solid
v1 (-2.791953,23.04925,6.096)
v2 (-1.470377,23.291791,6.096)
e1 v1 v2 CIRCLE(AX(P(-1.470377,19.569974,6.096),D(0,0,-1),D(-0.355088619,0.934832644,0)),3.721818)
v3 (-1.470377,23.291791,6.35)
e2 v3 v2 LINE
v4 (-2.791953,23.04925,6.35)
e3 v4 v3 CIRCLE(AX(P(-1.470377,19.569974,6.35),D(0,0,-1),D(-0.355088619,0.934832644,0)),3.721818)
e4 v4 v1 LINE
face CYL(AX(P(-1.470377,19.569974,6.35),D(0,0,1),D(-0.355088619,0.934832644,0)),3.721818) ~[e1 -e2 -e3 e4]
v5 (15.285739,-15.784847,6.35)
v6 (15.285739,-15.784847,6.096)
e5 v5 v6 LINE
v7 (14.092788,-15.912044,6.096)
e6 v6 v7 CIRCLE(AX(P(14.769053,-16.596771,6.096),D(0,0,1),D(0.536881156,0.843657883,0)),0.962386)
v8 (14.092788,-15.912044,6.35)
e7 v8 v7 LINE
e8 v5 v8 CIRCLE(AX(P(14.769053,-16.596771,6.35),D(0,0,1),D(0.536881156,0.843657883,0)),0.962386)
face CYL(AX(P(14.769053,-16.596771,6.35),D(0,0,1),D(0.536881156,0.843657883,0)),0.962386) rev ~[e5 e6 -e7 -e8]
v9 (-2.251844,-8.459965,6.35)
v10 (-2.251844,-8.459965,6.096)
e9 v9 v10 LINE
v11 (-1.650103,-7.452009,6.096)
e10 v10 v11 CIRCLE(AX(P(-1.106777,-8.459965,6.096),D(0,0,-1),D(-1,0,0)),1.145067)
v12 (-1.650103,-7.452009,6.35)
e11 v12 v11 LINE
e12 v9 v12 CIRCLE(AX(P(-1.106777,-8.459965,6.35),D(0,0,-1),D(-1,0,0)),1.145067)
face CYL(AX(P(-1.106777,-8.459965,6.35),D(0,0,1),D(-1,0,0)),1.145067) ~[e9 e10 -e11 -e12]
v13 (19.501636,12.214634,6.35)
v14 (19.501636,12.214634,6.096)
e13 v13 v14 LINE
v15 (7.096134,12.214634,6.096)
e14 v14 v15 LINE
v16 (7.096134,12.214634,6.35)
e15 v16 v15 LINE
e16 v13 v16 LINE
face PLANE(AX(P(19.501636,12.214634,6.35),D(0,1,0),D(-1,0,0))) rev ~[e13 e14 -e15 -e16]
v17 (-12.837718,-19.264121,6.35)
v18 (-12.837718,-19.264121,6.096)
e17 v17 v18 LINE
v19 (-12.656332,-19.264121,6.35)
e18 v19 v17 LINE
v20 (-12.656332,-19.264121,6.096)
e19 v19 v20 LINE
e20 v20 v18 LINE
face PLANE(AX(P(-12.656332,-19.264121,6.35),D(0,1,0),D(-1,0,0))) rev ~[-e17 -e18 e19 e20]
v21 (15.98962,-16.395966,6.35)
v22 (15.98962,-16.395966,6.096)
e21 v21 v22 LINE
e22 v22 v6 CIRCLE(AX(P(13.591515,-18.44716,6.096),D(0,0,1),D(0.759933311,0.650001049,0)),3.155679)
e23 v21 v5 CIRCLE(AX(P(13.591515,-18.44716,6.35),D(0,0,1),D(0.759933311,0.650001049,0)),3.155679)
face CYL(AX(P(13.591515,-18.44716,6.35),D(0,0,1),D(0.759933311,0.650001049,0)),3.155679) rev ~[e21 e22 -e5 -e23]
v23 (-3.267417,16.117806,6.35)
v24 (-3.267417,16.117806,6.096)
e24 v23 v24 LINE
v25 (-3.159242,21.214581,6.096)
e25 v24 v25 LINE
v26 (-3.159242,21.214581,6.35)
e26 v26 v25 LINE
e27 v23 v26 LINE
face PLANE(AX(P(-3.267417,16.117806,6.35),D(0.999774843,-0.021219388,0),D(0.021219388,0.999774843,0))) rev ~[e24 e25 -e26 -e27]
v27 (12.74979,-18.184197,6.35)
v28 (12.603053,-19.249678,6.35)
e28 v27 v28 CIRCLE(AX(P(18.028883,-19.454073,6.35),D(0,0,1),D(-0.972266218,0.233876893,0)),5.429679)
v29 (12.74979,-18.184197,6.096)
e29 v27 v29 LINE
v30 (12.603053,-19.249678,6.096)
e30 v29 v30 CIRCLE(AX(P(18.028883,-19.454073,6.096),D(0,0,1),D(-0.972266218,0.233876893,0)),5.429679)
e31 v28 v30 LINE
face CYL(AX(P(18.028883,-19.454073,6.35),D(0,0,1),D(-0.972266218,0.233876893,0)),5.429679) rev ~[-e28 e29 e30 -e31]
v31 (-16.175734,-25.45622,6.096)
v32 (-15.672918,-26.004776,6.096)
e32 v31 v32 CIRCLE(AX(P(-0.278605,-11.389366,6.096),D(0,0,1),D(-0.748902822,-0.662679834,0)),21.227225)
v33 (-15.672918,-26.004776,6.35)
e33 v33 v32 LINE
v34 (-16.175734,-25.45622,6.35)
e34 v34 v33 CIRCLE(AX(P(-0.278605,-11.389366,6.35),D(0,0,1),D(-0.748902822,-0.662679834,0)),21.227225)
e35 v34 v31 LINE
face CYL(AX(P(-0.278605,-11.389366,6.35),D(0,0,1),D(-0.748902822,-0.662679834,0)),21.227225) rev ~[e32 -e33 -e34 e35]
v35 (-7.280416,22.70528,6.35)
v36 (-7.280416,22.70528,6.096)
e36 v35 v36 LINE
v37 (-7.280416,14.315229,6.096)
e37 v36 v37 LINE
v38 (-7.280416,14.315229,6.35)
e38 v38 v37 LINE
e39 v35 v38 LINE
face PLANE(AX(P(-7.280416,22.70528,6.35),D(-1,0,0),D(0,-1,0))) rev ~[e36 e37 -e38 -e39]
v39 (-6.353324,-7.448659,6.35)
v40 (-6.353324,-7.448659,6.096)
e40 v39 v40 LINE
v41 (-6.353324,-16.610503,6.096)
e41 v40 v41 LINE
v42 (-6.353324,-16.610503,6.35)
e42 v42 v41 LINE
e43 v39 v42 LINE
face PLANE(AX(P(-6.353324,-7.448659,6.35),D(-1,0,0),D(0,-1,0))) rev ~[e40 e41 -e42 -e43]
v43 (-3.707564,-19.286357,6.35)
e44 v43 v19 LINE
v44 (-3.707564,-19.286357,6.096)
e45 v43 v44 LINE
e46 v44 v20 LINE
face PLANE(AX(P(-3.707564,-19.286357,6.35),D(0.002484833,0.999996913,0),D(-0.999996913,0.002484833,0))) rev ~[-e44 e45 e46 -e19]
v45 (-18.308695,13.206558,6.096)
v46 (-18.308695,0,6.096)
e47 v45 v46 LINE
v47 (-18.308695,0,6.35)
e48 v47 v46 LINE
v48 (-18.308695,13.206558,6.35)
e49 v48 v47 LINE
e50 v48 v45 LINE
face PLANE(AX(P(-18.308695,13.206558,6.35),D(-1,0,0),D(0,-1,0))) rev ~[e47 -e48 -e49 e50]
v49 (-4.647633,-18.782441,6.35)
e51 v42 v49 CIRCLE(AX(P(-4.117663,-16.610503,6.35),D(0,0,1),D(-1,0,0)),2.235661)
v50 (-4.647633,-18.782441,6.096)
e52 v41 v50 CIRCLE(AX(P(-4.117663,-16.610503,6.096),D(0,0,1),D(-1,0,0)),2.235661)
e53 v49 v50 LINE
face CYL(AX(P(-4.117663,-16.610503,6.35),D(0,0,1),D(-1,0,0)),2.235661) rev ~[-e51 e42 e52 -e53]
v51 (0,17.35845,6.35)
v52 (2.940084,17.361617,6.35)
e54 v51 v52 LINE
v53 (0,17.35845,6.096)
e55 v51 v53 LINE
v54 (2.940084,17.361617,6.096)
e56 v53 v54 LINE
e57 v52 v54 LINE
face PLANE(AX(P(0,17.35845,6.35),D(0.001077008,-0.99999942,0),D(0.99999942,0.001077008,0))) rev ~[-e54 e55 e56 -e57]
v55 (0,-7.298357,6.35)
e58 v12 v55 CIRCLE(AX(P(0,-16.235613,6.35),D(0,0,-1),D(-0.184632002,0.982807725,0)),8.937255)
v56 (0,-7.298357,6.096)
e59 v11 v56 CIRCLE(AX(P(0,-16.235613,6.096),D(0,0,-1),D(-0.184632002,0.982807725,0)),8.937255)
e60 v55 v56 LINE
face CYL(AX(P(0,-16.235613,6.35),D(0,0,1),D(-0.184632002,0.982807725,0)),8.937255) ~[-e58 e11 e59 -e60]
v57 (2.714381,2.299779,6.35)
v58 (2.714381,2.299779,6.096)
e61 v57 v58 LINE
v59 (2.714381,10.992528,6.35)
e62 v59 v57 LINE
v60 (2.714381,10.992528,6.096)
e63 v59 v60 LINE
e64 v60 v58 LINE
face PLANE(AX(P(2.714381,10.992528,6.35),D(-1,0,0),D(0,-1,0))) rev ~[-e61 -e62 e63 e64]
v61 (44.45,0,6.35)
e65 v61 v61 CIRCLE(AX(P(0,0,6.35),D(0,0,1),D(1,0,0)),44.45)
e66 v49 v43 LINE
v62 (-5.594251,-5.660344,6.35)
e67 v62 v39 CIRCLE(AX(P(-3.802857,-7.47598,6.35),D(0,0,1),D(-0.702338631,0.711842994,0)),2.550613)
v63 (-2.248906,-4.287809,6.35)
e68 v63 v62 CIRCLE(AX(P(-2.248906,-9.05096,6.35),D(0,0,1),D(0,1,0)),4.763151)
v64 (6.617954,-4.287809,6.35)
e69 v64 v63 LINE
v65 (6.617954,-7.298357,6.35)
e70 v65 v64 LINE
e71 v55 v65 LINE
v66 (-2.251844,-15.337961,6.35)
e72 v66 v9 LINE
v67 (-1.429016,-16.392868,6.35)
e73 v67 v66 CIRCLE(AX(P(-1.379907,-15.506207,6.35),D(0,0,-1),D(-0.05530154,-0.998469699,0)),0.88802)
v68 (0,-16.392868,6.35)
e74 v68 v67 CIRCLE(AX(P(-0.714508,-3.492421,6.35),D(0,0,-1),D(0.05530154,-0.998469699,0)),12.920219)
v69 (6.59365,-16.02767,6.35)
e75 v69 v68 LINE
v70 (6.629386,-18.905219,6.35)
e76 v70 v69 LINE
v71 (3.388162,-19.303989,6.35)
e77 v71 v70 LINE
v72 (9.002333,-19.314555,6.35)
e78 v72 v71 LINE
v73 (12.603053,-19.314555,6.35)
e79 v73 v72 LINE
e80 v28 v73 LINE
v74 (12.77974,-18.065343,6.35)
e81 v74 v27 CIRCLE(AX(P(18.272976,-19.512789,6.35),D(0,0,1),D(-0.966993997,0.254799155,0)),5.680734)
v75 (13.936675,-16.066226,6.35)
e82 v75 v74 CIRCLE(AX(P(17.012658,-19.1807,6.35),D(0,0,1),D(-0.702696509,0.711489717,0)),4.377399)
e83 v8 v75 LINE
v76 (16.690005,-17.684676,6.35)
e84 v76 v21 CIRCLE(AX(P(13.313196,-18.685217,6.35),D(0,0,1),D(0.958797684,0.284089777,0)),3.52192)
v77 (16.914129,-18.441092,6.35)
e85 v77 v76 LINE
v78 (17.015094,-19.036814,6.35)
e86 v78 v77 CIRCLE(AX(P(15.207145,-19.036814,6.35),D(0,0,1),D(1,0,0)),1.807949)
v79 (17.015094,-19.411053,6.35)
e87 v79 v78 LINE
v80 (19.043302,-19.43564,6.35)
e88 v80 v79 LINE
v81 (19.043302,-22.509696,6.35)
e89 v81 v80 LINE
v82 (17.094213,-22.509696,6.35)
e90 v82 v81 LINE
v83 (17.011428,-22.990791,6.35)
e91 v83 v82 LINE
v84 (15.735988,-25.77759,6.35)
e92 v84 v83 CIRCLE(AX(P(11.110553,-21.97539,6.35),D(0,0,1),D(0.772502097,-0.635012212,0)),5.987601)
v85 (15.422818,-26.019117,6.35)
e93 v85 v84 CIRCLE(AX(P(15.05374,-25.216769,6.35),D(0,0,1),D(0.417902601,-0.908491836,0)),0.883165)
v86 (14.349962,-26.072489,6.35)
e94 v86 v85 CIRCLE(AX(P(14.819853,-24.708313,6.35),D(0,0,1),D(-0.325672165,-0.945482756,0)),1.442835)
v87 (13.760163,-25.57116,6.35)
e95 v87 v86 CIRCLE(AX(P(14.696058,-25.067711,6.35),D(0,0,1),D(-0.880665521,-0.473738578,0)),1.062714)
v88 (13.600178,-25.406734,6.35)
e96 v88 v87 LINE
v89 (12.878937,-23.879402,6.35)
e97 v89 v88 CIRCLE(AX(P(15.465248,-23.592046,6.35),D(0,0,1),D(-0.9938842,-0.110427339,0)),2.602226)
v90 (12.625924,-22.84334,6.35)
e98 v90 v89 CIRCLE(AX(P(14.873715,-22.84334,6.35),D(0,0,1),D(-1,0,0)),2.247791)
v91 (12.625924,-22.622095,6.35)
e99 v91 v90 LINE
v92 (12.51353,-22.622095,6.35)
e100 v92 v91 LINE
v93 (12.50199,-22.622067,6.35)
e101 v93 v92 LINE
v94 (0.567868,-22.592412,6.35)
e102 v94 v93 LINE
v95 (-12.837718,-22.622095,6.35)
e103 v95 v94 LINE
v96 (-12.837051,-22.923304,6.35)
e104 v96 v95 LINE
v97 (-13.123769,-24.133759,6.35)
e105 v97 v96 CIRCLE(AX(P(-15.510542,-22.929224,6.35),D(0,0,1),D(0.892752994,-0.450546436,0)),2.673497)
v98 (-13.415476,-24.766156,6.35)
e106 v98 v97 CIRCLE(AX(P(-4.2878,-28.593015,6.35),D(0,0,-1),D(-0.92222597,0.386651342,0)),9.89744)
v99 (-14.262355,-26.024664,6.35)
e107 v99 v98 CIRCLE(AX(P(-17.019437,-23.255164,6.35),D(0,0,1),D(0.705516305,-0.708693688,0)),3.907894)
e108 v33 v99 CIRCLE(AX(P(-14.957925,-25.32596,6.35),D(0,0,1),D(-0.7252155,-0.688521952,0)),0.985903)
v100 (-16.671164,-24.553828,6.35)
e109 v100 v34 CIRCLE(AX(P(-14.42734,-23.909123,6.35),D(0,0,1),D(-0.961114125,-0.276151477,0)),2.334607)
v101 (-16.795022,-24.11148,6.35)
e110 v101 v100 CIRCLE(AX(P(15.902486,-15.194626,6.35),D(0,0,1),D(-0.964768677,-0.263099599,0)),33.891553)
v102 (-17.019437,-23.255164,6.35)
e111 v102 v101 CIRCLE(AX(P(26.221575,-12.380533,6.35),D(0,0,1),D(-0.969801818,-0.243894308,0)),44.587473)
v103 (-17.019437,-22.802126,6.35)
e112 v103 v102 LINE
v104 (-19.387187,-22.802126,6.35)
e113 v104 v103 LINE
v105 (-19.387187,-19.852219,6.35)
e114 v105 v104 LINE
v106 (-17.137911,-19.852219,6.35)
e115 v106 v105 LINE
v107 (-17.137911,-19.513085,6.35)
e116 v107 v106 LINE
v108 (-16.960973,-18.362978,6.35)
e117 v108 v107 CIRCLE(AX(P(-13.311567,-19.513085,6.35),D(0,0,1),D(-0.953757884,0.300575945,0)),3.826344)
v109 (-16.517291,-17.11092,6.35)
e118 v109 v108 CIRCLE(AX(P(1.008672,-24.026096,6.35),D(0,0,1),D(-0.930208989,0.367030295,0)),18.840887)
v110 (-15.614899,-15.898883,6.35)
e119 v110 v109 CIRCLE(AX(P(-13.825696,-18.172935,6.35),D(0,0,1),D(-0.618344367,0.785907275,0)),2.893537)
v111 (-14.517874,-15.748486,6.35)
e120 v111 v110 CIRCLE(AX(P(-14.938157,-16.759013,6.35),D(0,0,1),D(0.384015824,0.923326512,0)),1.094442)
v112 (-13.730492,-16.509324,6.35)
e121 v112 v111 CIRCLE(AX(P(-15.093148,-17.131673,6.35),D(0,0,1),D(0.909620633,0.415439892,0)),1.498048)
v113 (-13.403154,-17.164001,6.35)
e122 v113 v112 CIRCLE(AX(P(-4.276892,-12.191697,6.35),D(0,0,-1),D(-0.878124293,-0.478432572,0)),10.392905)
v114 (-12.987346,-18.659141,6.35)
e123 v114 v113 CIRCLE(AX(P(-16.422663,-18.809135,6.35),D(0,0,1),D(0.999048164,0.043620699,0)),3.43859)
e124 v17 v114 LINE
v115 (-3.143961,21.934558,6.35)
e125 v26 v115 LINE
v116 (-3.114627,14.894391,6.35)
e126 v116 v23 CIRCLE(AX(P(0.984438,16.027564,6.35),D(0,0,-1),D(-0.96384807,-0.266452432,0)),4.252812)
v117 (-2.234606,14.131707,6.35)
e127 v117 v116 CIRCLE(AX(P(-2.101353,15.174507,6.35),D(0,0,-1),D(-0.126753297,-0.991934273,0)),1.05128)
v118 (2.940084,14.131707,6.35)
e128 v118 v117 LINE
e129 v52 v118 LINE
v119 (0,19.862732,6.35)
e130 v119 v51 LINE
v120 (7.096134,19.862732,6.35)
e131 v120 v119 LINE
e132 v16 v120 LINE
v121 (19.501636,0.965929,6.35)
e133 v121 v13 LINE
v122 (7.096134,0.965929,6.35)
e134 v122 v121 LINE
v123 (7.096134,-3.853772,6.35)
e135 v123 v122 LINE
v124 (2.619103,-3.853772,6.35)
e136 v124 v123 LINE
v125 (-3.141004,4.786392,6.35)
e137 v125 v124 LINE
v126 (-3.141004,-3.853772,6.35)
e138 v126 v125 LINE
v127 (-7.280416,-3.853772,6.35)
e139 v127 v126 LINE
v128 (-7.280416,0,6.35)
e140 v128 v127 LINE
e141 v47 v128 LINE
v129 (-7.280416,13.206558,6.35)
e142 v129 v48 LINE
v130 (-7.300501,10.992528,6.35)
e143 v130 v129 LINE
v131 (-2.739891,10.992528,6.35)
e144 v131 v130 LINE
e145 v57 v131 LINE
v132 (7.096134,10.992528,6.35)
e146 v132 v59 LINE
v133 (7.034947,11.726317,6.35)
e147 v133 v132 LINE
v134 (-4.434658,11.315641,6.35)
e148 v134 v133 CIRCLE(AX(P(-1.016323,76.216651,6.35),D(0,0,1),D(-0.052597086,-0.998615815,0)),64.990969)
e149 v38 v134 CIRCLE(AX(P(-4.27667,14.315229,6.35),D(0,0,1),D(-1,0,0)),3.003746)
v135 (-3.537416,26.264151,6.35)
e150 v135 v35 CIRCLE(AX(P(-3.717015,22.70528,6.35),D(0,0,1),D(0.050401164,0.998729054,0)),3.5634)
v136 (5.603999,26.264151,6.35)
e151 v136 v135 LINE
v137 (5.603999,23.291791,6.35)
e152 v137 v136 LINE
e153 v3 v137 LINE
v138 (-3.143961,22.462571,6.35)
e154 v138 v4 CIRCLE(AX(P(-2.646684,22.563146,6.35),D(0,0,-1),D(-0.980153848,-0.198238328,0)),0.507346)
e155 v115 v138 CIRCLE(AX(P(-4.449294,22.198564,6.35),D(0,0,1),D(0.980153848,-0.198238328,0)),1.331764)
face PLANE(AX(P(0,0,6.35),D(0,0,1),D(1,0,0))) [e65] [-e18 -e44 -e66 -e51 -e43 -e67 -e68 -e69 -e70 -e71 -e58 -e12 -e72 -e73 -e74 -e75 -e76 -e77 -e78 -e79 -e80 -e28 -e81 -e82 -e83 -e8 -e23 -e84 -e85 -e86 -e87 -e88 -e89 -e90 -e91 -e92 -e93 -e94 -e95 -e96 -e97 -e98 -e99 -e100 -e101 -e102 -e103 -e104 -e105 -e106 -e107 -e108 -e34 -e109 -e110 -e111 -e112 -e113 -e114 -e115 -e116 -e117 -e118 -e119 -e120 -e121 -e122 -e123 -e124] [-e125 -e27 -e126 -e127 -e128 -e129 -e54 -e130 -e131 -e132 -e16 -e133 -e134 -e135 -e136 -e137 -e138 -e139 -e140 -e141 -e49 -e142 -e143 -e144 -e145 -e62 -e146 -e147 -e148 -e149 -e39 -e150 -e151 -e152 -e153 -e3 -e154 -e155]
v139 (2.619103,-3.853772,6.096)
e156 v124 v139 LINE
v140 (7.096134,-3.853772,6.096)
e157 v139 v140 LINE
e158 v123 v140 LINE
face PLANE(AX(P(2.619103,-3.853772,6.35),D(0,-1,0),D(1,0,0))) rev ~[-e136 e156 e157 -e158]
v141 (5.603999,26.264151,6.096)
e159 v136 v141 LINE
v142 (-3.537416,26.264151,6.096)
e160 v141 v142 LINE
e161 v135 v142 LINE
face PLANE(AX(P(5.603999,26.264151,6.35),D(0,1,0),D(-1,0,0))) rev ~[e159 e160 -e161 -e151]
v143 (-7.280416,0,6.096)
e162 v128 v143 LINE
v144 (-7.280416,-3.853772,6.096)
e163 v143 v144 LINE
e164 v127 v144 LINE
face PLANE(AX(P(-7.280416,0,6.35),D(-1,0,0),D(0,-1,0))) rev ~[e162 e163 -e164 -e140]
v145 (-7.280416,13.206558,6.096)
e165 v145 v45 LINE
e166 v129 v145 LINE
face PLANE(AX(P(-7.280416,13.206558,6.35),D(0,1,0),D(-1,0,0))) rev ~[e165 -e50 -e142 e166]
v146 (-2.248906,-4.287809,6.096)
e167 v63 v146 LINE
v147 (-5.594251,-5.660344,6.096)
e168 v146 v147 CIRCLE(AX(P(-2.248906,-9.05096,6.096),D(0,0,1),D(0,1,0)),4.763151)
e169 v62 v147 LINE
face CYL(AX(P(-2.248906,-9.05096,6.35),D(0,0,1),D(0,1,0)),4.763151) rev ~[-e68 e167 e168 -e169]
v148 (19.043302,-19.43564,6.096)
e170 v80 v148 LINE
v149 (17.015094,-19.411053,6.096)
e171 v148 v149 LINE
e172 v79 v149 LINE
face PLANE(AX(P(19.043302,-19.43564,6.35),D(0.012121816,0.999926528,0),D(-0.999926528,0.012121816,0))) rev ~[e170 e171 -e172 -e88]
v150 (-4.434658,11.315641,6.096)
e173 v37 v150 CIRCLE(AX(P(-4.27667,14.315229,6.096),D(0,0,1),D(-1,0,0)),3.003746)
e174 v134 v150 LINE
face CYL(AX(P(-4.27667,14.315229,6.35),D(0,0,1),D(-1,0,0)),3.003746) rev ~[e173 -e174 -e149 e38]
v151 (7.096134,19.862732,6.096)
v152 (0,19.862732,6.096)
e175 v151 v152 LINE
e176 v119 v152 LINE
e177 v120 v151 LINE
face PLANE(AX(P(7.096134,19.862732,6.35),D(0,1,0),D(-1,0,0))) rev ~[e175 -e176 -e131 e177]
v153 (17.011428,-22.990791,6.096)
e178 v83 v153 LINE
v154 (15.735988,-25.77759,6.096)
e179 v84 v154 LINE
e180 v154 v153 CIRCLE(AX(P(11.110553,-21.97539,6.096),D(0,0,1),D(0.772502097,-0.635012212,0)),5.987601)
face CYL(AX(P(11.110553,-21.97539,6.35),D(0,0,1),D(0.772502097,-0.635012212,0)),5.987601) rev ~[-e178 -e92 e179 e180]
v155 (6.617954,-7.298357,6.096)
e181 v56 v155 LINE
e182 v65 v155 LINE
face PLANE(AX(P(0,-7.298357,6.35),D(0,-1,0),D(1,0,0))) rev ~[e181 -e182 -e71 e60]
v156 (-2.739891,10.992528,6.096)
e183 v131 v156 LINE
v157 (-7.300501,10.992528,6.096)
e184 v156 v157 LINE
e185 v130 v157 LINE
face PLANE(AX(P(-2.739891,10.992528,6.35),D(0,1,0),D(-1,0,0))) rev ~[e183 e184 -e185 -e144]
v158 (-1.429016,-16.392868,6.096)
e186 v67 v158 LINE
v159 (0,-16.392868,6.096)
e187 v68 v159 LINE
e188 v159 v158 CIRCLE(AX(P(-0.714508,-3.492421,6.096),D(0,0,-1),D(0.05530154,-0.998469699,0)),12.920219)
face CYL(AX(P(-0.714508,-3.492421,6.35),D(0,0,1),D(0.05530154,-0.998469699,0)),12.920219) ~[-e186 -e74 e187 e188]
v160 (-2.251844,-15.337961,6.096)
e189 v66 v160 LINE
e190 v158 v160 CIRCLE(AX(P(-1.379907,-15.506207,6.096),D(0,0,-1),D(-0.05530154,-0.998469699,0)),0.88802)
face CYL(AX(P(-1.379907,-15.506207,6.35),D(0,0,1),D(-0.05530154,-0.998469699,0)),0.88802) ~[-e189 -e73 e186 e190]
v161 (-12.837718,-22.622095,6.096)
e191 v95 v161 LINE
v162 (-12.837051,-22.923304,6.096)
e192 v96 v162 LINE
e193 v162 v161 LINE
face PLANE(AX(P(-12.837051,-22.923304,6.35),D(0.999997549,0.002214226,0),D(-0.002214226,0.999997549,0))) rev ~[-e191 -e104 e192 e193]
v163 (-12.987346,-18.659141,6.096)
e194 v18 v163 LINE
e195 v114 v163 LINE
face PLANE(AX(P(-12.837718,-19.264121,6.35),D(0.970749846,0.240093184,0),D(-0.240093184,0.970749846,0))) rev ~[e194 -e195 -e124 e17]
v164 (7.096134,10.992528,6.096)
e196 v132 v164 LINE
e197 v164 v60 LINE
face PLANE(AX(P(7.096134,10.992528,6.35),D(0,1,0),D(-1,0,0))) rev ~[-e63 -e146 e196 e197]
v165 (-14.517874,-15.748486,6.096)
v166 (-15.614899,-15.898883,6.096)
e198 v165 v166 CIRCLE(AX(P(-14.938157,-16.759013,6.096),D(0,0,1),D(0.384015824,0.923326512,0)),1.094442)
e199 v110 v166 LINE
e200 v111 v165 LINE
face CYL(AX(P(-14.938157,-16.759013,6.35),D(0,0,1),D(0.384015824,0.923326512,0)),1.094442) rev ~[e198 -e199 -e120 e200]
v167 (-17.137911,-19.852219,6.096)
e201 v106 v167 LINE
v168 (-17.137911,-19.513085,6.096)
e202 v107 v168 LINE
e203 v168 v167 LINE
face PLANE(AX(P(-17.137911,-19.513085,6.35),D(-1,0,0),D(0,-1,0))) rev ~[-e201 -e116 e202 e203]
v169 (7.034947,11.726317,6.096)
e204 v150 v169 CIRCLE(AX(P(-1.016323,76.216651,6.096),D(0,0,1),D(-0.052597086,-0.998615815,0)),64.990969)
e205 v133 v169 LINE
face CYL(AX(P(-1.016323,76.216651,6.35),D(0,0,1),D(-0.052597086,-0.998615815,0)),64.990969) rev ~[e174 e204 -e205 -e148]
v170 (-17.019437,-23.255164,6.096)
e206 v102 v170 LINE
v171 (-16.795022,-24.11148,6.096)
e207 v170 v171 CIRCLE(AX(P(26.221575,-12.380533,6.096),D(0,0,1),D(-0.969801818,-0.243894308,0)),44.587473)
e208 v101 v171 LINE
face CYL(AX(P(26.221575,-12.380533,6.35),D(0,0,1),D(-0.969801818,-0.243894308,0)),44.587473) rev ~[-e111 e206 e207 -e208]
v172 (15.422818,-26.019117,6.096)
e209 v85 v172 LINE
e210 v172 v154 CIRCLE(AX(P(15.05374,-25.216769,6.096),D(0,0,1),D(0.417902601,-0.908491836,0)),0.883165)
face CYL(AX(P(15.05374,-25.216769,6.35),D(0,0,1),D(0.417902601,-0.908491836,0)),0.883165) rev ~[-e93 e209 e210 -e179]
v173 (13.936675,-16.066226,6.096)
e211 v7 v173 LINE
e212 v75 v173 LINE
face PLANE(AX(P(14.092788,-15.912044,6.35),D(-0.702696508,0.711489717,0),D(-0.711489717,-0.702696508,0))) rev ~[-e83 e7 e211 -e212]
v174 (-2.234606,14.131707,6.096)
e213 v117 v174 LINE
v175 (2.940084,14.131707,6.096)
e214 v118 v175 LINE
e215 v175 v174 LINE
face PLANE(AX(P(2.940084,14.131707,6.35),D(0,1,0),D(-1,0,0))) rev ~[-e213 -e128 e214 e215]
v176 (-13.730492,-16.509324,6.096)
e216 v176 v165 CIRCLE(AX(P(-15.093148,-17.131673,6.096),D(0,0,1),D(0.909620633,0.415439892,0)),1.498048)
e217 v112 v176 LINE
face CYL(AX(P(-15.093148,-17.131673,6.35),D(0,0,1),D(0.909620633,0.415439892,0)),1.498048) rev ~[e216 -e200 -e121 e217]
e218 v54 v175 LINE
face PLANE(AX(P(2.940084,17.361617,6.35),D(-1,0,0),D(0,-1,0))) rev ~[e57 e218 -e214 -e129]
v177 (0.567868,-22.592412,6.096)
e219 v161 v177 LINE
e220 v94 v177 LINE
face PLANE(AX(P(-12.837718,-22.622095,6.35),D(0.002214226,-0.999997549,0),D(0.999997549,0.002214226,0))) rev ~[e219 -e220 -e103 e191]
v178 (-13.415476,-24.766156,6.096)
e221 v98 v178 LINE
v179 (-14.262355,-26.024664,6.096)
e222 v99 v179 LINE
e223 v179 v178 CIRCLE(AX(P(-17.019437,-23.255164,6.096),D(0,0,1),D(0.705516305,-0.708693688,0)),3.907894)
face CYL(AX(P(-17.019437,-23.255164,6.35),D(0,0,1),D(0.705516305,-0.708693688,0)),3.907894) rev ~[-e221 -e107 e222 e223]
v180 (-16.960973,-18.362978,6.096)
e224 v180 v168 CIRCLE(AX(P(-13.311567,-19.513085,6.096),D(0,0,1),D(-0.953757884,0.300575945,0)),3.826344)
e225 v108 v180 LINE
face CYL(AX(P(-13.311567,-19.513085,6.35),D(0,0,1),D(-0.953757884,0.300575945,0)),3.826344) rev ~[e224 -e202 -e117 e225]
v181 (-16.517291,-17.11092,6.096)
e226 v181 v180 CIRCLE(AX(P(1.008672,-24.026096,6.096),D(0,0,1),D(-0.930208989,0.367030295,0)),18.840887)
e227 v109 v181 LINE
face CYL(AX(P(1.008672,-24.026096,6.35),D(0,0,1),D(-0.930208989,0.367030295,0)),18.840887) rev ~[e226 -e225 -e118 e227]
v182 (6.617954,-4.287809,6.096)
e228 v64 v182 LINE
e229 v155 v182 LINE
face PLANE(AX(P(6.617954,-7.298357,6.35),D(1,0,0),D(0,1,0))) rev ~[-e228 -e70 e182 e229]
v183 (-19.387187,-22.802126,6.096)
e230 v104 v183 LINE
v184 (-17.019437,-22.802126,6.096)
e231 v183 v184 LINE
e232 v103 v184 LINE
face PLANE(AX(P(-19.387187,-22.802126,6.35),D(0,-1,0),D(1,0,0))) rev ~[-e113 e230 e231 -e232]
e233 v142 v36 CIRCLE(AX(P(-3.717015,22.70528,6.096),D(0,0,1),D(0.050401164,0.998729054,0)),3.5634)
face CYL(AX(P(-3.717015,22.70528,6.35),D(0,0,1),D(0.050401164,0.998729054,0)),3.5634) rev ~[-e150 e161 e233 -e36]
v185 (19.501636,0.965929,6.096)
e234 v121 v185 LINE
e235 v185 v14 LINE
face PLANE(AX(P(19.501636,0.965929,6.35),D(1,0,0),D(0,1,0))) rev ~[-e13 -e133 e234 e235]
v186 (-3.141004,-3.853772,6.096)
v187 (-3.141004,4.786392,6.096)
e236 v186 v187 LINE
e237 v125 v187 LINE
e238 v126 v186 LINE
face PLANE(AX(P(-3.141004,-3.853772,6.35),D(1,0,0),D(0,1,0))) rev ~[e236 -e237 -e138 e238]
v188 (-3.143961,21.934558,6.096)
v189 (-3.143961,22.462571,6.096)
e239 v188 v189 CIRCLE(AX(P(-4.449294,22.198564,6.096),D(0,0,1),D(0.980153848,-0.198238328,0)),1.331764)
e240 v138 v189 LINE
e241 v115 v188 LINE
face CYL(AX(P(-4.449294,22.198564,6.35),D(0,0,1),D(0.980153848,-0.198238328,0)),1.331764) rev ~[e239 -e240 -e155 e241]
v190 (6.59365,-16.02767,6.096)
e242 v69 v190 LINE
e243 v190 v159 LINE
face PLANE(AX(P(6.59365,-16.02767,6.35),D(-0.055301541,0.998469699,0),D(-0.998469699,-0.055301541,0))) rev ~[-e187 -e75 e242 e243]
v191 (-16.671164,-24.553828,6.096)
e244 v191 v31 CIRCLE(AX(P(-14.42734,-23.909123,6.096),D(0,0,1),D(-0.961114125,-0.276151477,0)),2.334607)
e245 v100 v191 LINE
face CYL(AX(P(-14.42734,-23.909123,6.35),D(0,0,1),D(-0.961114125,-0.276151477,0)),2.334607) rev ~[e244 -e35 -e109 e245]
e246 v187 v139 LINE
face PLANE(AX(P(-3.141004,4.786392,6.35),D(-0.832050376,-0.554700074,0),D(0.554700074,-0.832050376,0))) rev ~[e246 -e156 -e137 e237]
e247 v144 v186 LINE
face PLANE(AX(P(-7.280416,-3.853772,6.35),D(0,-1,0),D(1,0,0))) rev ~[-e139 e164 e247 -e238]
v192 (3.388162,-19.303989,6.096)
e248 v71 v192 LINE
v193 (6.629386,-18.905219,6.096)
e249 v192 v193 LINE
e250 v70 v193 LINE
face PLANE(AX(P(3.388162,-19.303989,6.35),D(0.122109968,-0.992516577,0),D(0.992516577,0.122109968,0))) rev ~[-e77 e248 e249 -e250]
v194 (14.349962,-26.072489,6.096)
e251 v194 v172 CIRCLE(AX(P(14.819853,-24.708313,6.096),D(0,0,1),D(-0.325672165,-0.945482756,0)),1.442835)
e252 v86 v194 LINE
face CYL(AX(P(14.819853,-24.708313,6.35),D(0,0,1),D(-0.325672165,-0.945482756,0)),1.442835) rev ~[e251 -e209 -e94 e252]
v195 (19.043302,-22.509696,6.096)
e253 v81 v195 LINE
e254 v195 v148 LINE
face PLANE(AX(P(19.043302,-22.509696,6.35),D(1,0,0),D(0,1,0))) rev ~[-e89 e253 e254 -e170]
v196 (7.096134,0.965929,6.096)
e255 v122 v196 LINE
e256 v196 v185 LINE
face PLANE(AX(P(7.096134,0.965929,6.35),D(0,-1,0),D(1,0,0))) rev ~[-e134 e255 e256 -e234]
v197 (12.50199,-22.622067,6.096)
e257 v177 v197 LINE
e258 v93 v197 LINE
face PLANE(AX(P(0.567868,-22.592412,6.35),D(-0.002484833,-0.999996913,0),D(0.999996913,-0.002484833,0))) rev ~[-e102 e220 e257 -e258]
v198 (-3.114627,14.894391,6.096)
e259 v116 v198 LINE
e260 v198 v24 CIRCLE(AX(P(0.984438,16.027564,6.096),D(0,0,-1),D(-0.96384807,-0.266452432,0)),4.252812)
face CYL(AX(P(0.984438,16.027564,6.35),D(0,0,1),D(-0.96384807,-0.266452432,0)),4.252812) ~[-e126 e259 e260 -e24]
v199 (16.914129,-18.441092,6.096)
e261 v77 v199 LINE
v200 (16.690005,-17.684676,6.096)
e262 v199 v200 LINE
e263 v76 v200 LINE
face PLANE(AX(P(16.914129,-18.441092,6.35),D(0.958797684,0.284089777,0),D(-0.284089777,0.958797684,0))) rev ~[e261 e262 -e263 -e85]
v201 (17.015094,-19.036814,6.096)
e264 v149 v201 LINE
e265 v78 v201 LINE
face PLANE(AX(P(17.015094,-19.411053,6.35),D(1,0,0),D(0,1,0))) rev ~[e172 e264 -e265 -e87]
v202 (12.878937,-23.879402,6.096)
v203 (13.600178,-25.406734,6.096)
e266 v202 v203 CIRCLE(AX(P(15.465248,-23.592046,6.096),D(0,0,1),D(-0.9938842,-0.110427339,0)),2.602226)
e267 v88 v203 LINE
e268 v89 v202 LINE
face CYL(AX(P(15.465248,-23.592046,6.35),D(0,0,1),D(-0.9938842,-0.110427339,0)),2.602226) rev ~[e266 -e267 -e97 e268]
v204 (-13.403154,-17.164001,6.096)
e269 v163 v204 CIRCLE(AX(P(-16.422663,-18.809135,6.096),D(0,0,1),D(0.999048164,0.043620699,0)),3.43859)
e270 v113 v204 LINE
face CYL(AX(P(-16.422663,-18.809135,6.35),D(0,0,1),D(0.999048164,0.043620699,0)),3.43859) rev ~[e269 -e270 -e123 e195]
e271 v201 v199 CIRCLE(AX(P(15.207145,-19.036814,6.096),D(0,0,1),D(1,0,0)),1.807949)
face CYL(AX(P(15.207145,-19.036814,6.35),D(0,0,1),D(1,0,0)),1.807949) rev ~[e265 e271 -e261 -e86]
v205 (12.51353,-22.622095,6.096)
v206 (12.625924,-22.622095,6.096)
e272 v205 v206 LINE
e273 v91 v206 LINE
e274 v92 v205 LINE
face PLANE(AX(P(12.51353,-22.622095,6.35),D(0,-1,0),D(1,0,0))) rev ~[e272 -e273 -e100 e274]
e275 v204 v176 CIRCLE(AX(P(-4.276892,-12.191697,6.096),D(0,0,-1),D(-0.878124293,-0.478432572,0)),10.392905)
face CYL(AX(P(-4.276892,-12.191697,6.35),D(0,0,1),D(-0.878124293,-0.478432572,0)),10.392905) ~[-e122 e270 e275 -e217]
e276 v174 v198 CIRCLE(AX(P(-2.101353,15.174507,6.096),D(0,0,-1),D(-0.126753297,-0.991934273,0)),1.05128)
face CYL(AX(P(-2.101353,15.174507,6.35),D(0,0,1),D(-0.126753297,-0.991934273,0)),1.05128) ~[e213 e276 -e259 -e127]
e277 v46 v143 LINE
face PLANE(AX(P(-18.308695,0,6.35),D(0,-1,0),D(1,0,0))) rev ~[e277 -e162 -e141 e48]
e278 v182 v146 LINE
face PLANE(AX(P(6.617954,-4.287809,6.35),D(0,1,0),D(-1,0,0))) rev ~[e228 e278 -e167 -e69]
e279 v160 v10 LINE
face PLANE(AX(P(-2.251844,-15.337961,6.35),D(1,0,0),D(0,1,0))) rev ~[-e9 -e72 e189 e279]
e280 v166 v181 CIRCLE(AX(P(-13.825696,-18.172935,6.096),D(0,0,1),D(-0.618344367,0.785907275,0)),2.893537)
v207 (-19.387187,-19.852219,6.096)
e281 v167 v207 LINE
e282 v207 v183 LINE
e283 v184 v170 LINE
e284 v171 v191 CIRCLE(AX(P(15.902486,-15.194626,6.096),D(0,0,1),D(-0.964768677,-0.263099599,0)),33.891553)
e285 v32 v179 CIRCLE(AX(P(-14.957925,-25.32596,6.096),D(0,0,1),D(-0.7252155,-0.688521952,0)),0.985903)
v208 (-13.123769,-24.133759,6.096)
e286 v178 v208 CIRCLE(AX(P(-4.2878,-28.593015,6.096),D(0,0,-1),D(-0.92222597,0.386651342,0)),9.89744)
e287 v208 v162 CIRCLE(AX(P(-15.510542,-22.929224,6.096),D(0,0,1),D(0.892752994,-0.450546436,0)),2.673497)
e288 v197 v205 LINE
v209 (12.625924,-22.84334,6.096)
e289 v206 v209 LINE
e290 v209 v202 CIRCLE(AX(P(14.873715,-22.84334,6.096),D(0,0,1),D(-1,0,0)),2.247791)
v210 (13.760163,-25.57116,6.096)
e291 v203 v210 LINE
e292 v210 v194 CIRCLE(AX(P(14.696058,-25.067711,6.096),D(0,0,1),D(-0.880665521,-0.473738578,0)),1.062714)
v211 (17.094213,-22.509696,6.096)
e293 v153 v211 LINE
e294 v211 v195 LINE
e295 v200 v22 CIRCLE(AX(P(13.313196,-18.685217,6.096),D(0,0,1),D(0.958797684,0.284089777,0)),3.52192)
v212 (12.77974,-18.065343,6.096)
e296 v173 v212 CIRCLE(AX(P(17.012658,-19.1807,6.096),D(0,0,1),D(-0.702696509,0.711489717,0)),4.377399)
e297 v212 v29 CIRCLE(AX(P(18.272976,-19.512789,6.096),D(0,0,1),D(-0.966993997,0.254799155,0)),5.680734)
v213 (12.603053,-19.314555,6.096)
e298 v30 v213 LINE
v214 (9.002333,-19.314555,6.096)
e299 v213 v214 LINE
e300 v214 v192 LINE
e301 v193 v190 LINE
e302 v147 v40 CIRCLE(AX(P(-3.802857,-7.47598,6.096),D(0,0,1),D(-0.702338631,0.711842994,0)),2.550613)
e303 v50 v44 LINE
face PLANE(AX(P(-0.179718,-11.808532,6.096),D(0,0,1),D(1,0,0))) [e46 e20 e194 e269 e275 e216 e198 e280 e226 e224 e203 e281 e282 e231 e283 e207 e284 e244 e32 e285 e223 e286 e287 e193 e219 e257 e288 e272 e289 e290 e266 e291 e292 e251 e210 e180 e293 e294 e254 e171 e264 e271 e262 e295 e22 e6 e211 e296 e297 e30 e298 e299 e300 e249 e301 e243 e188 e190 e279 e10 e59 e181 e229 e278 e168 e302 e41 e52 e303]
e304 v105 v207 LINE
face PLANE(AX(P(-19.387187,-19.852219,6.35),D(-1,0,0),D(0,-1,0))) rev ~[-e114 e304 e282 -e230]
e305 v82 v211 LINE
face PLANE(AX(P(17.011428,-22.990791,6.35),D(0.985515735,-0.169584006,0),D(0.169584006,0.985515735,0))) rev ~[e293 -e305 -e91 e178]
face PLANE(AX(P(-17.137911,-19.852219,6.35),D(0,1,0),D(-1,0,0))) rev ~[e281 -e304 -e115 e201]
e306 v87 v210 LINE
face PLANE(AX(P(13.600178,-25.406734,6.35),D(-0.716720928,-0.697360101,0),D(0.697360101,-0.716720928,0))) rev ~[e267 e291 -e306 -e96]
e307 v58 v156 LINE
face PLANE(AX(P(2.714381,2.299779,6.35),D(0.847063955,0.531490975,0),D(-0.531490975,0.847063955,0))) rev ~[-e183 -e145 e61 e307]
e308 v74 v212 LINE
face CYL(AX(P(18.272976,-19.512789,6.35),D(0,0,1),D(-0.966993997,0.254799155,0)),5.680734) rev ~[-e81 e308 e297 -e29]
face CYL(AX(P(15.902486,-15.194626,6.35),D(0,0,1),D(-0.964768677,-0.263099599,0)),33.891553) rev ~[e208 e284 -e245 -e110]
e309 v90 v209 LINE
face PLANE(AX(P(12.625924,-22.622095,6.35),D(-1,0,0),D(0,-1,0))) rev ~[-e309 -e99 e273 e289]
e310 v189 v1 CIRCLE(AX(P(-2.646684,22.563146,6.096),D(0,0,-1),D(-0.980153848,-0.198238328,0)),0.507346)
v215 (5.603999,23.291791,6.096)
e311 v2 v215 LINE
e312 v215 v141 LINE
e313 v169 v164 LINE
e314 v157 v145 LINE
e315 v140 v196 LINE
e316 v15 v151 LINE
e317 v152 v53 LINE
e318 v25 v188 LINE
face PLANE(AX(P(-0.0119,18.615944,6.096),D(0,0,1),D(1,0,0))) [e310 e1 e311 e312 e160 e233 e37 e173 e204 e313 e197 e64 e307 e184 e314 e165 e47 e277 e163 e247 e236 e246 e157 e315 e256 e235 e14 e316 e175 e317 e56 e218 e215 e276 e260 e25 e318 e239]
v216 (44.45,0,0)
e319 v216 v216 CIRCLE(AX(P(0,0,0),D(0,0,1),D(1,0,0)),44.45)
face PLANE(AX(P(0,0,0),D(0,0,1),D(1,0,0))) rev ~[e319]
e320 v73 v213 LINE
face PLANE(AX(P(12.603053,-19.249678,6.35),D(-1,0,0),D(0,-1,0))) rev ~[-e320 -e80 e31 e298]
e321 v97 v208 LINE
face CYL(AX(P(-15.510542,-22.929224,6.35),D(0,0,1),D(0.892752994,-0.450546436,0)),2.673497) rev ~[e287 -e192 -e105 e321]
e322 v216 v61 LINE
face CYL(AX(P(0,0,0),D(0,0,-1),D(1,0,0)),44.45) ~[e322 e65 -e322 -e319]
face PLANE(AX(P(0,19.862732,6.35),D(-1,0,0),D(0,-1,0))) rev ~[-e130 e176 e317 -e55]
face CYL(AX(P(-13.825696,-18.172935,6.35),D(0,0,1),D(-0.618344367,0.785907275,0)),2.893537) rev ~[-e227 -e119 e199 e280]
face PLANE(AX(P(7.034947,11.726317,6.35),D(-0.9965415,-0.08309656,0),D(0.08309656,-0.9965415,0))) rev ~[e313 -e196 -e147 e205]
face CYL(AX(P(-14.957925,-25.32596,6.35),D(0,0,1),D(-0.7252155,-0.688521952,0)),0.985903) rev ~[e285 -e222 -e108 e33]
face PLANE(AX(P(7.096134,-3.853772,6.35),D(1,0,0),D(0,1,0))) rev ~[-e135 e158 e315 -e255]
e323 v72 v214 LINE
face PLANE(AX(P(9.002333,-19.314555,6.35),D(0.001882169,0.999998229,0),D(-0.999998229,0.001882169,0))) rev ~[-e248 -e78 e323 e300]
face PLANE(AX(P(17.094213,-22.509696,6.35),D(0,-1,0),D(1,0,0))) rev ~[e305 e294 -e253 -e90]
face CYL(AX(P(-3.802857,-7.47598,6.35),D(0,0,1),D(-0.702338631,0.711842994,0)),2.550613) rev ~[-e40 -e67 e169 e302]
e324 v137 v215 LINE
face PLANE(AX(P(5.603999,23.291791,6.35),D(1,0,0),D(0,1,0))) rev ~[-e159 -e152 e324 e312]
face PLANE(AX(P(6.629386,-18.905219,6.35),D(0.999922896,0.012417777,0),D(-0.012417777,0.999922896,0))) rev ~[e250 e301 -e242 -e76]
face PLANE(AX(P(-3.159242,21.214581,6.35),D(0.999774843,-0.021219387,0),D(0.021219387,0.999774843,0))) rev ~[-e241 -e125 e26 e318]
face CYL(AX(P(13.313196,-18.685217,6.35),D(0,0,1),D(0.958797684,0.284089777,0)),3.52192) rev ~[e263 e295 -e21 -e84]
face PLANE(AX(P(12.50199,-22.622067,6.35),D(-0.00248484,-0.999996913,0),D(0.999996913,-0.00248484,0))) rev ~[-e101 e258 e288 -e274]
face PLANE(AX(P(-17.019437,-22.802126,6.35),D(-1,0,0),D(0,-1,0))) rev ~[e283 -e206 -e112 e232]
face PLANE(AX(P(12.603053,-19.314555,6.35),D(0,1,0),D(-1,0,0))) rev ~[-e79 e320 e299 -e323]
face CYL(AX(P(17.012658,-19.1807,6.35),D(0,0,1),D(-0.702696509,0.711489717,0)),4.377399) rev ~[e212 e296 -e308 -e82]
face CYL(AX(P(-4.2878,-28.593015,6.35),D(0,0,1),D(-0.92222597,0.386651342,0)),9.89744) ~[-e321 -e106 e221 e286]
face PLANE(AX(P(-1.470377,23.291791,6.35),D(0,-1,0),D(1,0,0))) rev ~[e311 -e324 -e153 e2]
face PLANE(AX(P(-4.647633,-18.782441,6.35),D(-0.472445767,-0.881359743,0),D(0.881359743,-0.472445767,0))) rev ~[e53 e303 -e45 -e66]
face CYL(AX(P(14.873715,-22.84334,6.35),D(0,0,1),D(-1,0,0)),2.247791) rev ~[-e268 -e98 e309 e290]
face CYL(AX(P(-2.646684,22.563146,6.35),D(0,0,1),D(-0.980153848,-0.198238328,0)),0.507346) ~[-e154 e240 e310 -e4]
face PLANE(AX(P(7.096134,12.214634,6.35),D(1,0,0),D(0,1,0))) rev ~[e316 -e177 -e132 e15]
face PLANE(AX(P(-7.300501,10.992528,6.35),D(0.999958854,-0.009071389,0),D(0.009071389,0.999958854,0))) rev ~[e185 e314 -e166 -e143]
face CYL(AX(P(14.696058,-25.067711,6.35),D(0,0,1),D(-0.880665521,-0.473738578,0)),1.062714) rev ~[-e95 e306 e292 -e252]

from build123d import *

# Parameters (mm, degrees)
F0_R     = 44.45
F1_DEPTH = 6.35
F3_DEPTH = 0.254


# Not quite as in the source:
# - ends of sketch curves that miss each other by under 0.0002 mm in the source are joined


with BuildPart() as f1:
    # F0 (on Top) → F1 (new body)
    with BuildSketch(Plane.XY):
        Circle(F0_R)
    extrude(amount=F1_DEPTH)

    # F2 (on face) → F3 (cut)
    with BuildSketch(Plane.XY.offset(6.35)):
        with BuildLine():
            Line((5.6039993651, 23.2917912652), (5.6039993651, 26.2641511811))
            Line((5.6039993651, 26.2641511811), (-3.5374157604, 26.2641511811))
            ThreePointArc((-3.5374157604, 26.2641511811), (-6.1724008767, 25.2877017598), (-7.2804156008, 22.7052797559))
            Line((-7.2804156008, 22.7052797559), (-7.2804156008, 14.3152289093))
            ThreePointArc((-7.2804156008, 14.3152289093), (-6.4557803762, 12.2478717336), (-4.4346582144, 11.3156409934))
            ThreePointArc((-4.4346582144, 11.3156409934), (1.3092272973, 11.2673019991), (7.0349466987, 11.7263169959))
            Line((7.0349466987, 11.7263169959), (7.0961336605, 12.2146336362))
            Line((7.0961336605, 12.2146336362), (7.0961336605, 19.8627323627))
            Line((7.0961336605, 19.8627323627), (0, 19.8627323627))
            Line((0, 19.8627323627), (0, 17.358450219))
            Line((0, 17.358450219), (2.9400843196, 17.3616167158))
            Line((2.9400843196, 17.3616167158), (2.9400843196, 14.1317071393))
            Line((2.9400843196, 14.1317071393), (0, 14.1317071393))
            Line((0, 14.1317071393), (-2.2346060723, 14.1317071393))
            ThreePointArc((-2.2346060723, 14.1317071393), (-2.7898678793, 14.3800667532), (-3.1146267429, 14.8943914101))
            ThreePointArc((-3.1146267429, 14.8943914101), (-3.2355914853, 15.5005322545), (-3.2674165577, 16.1178055789))
            Line((-3.2674165577, 16.1178055789), (-3.1592417437, 21.2145812126))
            ThreePointArc((-3.1592417437, 21.2145812126), (-3.1837866635, 21.575252567), (-3.1439608429, 21.9345577061))
            ThreePointArc((-3.1439608429, 21.9345577061), (-3.117530452, 22.198564373), (-3.1439608429, 22.4625710398))
            ThreePointArc((-3.1439608429, 22.4625710398), (-3.0817290753, 22.8241742068), (-2.7919525746, 23.0492502451))
            ThreePointArc((-2.7919525746, 23.0492502451), (-2.1422008965, 23.2306538656), (-1.4703774561, 23.2917912652))
            Line((-1.4703774561, 23.2917912652), (5.6039993651, 23.2917912652))
        make_face()
        with BuildLine():
            Line((-3.1592417437, 21.2145812126), (-3.1439608429, 21.9345577061))
            ThreePointArc((-3.1439608429, 21.9345577061), (-3.1837866635, 21.575252567), (-3.1592417437, 21.2145812126))
        make_face()
        Polygon((7.0961336605, 12.2146336362), (7.0349466987, 11.7263169959), (7.0961336605, 10.9925279394), (7.0961336605, 0.9659290663), (19.5016358048, 0.9659290663), (19.5016358048, 12.2146336362), align=None)
        Polygon((7.0961336605, 0.9659290663), (7.0961336605, 10.9925279394), (2.7143813204, 10.9925279394), (2.7143813204, 2.2997791572), (-2.7398910557, 10.9925279394), (-7.300500758, 10.9925279394), (-7.2804156008, 0), (-7.2804156008, -3.8537723012), (-6.2781353481, -3.8537723012), (-3.1410043308, -3.8537723012), (-3.1410043308, 4.7863919603), (2.6191033489, -3.8537723012), (7.0961336605, -3.8537723012), align=None)
        Polygon((-7.2804156008, 0), (-7.300500758, 10.9925279394), (-7.2804156008, 13.206558302), (-18.3086954057, 13.206558302), (-18.3086954057, 0), align=None)
        with BuildLine():
            Line((0, -7.2983574902), (6.6179535352, -7.2983574902))
            Line((6.6179535352, -7.2983574902), (6.6179535352, -4.2878086955))
            Line((6.6179535352, -4.2878086955), (-2.2489061664, -4.2878086955))
            ThreePointArc((-2.2489061664, -4.2878086955), (-4.0568875501, -4.6442817118), (-5.5942512015, -5.6603440615))
            ThreePointArc((-5.5942512015, -5.6603440615), (-6.1507192567, -6.4794007942), (-6.3533238135, -7.4486592847))
            Line((-6.3533238135, -7.4486592847), (-6.3533238135, -16.6105034737))
            ThreePointArc((-6.3533238135, -16.6105034737), (-5.8759308245, -17.9913268961), (-4.6476325952, -18.782440573))
            Line((-4.6476325952, -18.782440573), (-3.7075637703, -19.2863568686))
            Line((-3.7075637703, -19.2863568686), (3.3881619917, -19.303988614))
            Line((3.3881619917, -19.303988614), (6.6293859856, -18.9052186906))
            Line((6.6293859856, -18.9052186906), (6.593650474, -16.0276701207))
            Line((6.593650474, -16.0276701207), (0, -16.3928680122))
            ThreePointArc((0, -16.3928680122), (-0.7145080017, -16.4126398372), (-1.4290160034, -16.3928680122))
            ThreePointArc((-1.4290160034, -16.3928680122), (-2.080113152, -16.0523673946), (-2.251843689, -15.3379607946))
            Line((-2.251843689, -15.3379607946), (-2.251843689, -8.4599647671))
            ThreePointArc((-2.251843689, -8.4599647671), (-2.0899663646, -7.8730095416), (-1.6501033679, -7.4520092458))
            ThreePointArc((-1.6501033679, -7.4520092458), (-0.8286208401, -7.3368533365), (0, -7.2983574902))
        make_face()
        with BuildLine():
            Line((3.3881619917, -19.303988614), (-3.7075637703, -19.2863568686))
            Line((-3.7075637703, -19.2863568686), (-12.6563319936, -19.2641206086))
            Line((-12.6563319936, -19.2641206086), (-12.8377182409, -19.2641206086))
            Line((-12.8377182409, -19.2641206086), (-12.9873463884, -18.6591409147))
            ThreePointArc((-12.9873463884, -18.6591409147), (-13.1098010784, -17.8878071535), (-13.4031539783, -17.1640012413))
            ThreePointArc((-13.4031539783, -17.1640012413), (-13.5725884432, -16.8395453931), (-13.7304924428, -16.5093243122))
            ThreePointArc((-13.7304924428, -16.5093243122), (-14.0521811274, -16.0543913958), (-14.5178735256, -15.7484859228))
            ThreePointArc((-14.5178735256, -15.7484859228), (-15.086809482, -15.6747136098), (-15.6148988754, -15.8988833427))
            ThreePointArc((-15.6148988754, -15.8988833427), (-16.1466107031, -16.4449553577), (-16.5172908455, -17.1109195799))
            ThreePointArc((-16.5172908455, -17.1109195799), (-16.7501696159, -17.7330376736), (-16.9609729201, -18.3629784733))
            ThreePointArc((-16.9609729201, -18.3629784733), (-17.0934179213, -18.9312665088), (-17.1379111707, -19.5130854845))
            Line((-17.1379111707, -19.5130854845), (-17.1379111707, -19.8522191495))
            Line((-17.1379111707, -19.8522191495), (-19.3871874362, -19.8522191495))
            Line((-19.3871874362, -19.8522191495), (-19.3871874362, -22.8021256626))
            Line((-19.3871874362, -22.8021256626), (-17.0194374538, -22.8021256626))
            Line((-17.0194374538, -22.8021256626), (-17.0194374538, -23.2551640704))
            ThreePointArc((-17.0194374538, -23.2551640704), (-16.9093551317, -23.6838787474), (-16.7950224131, -24.1114795208))
            ThreePointArc((-16.7950224131, -24.1114795208), (-16.7338426372, -24.3328635786), (-16.6711639613, -24.5538279414))
            ThreePointArc((-16.6711639613, -24.5538279414), (-16.4738073507, -25.0326716474), (-16.1757338792, -25.4562199116))
            ThreePointArc((-16.1757338792, -25.4562199116), (-15.9267297619, -25.732701627), (-15.6729177634, -26.0047763574))
            ThreePointArc((-15.6729177634, -26.0047763574), (-14.9718242273, -26.3117655956), (-14.2623546636, -26.0246637372))
            ThreePointArc((-14.2623546636, -26.0246637372), (-13.7772653209, -25.4368959002), (-13.4154763073, -24.7661564499))
            ThreePointArc((-13.4154763073, -24.7661564499), (-13.2751868701, -24.4473909933), (-13.1237693131, -24.1337586194))
            ThreePointArc((-13.1237693131, -24.1337586194), (-12.9090296801, -23.5454392253), (-12.837051295, -22.9233042467))
            Line((-12.837051295, -22.9233042467), (-12.8377182409, -22.622095421))
            Line((-12.8377182409, -22.622095421), (0.5678676759, -22.592412358))
            Line((0.5678676759, -22.592412358), (12.5019904939, -22.6220667474))
            Line((12.5019904939, -22.6220667474), (12.5135298725, -22.622095421))
            Line((12.5135298725, -22.622095421), (12.6259239413, -22.622095421))
            Line((12.6259239413, -22.622095421), (12.6259239413, -22.8433404118))
            ThreePointArc((12.6259239413, -22.8433404118), (12.6900931034, -23.3765945805), (12.878936831, -23.8794024329))
            ThreePointArc((12.878936831, -23.8794024329), (13.1121897024, -24.7032143779), (13.6001783309, -25.4067341867))
            Line((13.6001783309, -25.4067341867), (13.7601625174, -25.5711600184))
            ThreePointArc((13.7601625174, -25.5711600184), (14.0077931702, -25.8774350672), (14.3499616533, -26.0724890977))
            ThreePointArc((14.3499616533, -26.0724890977), (14.8915415981, -26.1493664388), (15.4228175364, -26.0191172952))
            ThreePointArc((15.4228175364, -26.0191172952), (15.5930961418, -25.9161088082), (15.7359875739, -25.7775895298))
            ThreePointArc((15.7359875739, -25.7775895298), (16.5550328697, -24.4671777543), (17.0114282519, -22.9907911271))
            Line((17.0114282519, -22.9907911271), (17.0942133791, -22.5096959621))
            Line((17.0942133791, -22.5096959621), (19.0433021635, -22.5096959621))
            Line((19.0433021635, -22.5096959621), (19.0433021635, -19.4356404245))
            Line((19.0433021635, -19.4356404245), (17.0150939375, -19.4110530503))
            Line((17.0150939375, -19.4110530503), (17.0150939375, -19.0368138024))
            ThreePointArc((17.0150939375, -19.0368138024), (16.989674065, -18.7347053505), (16.9141292572, -18.4410922229))
            Line((16.9141292572, -18.4410922229), (16.690004617, -17.6846757531))
            ThreePointArc((16.690004617, -17.6846757531), (16.407642716, -17.0034564681), (15.9896202385, -16.3959655911))
            ThreePointArc((15.9896202385, -16.3959655911), (15.6603689447, -16.0642729564), (15.2857392253, -15.7848467735))
            ThreePointArc((15.2857392253, -15.7848467735), (14.6670179234, -15.6398096454), (14.0927875351, -15.9120435136))
            Line((14.0927875351, -15.9120435136), (13.9366754533, -16.0662262266))
            ThreePointArc((13.9366754533, -16.0662262266), (13.2239743808, -16.988100564), (12.7797400013, -18.0653428434))
            ThreePointArc((12.7797400013, -18.0653428434), (12.7644443964, -18.1246889663), (12.7497899169, -18.1841966471))
            ThreePointArc((12.7497899169, -18.1841966471), (12.6499744154, -18.7132948986), (12.6030528918, -19.2496776581))
            Line((12.6030528918, -19.2496776581), (12.6030528918, -19.3145554513))
            Line((12.6030528918, -19.3145554513), (9.0023325756, -19.3145554513))
            Line((9.0023325756, -19.3145554513), (3.3881619917, -19.303988614))
        make_face()
    extrude(amount=-F3_DEPTH, mode=Mode.SUBTRACT)


solid = f1.part
